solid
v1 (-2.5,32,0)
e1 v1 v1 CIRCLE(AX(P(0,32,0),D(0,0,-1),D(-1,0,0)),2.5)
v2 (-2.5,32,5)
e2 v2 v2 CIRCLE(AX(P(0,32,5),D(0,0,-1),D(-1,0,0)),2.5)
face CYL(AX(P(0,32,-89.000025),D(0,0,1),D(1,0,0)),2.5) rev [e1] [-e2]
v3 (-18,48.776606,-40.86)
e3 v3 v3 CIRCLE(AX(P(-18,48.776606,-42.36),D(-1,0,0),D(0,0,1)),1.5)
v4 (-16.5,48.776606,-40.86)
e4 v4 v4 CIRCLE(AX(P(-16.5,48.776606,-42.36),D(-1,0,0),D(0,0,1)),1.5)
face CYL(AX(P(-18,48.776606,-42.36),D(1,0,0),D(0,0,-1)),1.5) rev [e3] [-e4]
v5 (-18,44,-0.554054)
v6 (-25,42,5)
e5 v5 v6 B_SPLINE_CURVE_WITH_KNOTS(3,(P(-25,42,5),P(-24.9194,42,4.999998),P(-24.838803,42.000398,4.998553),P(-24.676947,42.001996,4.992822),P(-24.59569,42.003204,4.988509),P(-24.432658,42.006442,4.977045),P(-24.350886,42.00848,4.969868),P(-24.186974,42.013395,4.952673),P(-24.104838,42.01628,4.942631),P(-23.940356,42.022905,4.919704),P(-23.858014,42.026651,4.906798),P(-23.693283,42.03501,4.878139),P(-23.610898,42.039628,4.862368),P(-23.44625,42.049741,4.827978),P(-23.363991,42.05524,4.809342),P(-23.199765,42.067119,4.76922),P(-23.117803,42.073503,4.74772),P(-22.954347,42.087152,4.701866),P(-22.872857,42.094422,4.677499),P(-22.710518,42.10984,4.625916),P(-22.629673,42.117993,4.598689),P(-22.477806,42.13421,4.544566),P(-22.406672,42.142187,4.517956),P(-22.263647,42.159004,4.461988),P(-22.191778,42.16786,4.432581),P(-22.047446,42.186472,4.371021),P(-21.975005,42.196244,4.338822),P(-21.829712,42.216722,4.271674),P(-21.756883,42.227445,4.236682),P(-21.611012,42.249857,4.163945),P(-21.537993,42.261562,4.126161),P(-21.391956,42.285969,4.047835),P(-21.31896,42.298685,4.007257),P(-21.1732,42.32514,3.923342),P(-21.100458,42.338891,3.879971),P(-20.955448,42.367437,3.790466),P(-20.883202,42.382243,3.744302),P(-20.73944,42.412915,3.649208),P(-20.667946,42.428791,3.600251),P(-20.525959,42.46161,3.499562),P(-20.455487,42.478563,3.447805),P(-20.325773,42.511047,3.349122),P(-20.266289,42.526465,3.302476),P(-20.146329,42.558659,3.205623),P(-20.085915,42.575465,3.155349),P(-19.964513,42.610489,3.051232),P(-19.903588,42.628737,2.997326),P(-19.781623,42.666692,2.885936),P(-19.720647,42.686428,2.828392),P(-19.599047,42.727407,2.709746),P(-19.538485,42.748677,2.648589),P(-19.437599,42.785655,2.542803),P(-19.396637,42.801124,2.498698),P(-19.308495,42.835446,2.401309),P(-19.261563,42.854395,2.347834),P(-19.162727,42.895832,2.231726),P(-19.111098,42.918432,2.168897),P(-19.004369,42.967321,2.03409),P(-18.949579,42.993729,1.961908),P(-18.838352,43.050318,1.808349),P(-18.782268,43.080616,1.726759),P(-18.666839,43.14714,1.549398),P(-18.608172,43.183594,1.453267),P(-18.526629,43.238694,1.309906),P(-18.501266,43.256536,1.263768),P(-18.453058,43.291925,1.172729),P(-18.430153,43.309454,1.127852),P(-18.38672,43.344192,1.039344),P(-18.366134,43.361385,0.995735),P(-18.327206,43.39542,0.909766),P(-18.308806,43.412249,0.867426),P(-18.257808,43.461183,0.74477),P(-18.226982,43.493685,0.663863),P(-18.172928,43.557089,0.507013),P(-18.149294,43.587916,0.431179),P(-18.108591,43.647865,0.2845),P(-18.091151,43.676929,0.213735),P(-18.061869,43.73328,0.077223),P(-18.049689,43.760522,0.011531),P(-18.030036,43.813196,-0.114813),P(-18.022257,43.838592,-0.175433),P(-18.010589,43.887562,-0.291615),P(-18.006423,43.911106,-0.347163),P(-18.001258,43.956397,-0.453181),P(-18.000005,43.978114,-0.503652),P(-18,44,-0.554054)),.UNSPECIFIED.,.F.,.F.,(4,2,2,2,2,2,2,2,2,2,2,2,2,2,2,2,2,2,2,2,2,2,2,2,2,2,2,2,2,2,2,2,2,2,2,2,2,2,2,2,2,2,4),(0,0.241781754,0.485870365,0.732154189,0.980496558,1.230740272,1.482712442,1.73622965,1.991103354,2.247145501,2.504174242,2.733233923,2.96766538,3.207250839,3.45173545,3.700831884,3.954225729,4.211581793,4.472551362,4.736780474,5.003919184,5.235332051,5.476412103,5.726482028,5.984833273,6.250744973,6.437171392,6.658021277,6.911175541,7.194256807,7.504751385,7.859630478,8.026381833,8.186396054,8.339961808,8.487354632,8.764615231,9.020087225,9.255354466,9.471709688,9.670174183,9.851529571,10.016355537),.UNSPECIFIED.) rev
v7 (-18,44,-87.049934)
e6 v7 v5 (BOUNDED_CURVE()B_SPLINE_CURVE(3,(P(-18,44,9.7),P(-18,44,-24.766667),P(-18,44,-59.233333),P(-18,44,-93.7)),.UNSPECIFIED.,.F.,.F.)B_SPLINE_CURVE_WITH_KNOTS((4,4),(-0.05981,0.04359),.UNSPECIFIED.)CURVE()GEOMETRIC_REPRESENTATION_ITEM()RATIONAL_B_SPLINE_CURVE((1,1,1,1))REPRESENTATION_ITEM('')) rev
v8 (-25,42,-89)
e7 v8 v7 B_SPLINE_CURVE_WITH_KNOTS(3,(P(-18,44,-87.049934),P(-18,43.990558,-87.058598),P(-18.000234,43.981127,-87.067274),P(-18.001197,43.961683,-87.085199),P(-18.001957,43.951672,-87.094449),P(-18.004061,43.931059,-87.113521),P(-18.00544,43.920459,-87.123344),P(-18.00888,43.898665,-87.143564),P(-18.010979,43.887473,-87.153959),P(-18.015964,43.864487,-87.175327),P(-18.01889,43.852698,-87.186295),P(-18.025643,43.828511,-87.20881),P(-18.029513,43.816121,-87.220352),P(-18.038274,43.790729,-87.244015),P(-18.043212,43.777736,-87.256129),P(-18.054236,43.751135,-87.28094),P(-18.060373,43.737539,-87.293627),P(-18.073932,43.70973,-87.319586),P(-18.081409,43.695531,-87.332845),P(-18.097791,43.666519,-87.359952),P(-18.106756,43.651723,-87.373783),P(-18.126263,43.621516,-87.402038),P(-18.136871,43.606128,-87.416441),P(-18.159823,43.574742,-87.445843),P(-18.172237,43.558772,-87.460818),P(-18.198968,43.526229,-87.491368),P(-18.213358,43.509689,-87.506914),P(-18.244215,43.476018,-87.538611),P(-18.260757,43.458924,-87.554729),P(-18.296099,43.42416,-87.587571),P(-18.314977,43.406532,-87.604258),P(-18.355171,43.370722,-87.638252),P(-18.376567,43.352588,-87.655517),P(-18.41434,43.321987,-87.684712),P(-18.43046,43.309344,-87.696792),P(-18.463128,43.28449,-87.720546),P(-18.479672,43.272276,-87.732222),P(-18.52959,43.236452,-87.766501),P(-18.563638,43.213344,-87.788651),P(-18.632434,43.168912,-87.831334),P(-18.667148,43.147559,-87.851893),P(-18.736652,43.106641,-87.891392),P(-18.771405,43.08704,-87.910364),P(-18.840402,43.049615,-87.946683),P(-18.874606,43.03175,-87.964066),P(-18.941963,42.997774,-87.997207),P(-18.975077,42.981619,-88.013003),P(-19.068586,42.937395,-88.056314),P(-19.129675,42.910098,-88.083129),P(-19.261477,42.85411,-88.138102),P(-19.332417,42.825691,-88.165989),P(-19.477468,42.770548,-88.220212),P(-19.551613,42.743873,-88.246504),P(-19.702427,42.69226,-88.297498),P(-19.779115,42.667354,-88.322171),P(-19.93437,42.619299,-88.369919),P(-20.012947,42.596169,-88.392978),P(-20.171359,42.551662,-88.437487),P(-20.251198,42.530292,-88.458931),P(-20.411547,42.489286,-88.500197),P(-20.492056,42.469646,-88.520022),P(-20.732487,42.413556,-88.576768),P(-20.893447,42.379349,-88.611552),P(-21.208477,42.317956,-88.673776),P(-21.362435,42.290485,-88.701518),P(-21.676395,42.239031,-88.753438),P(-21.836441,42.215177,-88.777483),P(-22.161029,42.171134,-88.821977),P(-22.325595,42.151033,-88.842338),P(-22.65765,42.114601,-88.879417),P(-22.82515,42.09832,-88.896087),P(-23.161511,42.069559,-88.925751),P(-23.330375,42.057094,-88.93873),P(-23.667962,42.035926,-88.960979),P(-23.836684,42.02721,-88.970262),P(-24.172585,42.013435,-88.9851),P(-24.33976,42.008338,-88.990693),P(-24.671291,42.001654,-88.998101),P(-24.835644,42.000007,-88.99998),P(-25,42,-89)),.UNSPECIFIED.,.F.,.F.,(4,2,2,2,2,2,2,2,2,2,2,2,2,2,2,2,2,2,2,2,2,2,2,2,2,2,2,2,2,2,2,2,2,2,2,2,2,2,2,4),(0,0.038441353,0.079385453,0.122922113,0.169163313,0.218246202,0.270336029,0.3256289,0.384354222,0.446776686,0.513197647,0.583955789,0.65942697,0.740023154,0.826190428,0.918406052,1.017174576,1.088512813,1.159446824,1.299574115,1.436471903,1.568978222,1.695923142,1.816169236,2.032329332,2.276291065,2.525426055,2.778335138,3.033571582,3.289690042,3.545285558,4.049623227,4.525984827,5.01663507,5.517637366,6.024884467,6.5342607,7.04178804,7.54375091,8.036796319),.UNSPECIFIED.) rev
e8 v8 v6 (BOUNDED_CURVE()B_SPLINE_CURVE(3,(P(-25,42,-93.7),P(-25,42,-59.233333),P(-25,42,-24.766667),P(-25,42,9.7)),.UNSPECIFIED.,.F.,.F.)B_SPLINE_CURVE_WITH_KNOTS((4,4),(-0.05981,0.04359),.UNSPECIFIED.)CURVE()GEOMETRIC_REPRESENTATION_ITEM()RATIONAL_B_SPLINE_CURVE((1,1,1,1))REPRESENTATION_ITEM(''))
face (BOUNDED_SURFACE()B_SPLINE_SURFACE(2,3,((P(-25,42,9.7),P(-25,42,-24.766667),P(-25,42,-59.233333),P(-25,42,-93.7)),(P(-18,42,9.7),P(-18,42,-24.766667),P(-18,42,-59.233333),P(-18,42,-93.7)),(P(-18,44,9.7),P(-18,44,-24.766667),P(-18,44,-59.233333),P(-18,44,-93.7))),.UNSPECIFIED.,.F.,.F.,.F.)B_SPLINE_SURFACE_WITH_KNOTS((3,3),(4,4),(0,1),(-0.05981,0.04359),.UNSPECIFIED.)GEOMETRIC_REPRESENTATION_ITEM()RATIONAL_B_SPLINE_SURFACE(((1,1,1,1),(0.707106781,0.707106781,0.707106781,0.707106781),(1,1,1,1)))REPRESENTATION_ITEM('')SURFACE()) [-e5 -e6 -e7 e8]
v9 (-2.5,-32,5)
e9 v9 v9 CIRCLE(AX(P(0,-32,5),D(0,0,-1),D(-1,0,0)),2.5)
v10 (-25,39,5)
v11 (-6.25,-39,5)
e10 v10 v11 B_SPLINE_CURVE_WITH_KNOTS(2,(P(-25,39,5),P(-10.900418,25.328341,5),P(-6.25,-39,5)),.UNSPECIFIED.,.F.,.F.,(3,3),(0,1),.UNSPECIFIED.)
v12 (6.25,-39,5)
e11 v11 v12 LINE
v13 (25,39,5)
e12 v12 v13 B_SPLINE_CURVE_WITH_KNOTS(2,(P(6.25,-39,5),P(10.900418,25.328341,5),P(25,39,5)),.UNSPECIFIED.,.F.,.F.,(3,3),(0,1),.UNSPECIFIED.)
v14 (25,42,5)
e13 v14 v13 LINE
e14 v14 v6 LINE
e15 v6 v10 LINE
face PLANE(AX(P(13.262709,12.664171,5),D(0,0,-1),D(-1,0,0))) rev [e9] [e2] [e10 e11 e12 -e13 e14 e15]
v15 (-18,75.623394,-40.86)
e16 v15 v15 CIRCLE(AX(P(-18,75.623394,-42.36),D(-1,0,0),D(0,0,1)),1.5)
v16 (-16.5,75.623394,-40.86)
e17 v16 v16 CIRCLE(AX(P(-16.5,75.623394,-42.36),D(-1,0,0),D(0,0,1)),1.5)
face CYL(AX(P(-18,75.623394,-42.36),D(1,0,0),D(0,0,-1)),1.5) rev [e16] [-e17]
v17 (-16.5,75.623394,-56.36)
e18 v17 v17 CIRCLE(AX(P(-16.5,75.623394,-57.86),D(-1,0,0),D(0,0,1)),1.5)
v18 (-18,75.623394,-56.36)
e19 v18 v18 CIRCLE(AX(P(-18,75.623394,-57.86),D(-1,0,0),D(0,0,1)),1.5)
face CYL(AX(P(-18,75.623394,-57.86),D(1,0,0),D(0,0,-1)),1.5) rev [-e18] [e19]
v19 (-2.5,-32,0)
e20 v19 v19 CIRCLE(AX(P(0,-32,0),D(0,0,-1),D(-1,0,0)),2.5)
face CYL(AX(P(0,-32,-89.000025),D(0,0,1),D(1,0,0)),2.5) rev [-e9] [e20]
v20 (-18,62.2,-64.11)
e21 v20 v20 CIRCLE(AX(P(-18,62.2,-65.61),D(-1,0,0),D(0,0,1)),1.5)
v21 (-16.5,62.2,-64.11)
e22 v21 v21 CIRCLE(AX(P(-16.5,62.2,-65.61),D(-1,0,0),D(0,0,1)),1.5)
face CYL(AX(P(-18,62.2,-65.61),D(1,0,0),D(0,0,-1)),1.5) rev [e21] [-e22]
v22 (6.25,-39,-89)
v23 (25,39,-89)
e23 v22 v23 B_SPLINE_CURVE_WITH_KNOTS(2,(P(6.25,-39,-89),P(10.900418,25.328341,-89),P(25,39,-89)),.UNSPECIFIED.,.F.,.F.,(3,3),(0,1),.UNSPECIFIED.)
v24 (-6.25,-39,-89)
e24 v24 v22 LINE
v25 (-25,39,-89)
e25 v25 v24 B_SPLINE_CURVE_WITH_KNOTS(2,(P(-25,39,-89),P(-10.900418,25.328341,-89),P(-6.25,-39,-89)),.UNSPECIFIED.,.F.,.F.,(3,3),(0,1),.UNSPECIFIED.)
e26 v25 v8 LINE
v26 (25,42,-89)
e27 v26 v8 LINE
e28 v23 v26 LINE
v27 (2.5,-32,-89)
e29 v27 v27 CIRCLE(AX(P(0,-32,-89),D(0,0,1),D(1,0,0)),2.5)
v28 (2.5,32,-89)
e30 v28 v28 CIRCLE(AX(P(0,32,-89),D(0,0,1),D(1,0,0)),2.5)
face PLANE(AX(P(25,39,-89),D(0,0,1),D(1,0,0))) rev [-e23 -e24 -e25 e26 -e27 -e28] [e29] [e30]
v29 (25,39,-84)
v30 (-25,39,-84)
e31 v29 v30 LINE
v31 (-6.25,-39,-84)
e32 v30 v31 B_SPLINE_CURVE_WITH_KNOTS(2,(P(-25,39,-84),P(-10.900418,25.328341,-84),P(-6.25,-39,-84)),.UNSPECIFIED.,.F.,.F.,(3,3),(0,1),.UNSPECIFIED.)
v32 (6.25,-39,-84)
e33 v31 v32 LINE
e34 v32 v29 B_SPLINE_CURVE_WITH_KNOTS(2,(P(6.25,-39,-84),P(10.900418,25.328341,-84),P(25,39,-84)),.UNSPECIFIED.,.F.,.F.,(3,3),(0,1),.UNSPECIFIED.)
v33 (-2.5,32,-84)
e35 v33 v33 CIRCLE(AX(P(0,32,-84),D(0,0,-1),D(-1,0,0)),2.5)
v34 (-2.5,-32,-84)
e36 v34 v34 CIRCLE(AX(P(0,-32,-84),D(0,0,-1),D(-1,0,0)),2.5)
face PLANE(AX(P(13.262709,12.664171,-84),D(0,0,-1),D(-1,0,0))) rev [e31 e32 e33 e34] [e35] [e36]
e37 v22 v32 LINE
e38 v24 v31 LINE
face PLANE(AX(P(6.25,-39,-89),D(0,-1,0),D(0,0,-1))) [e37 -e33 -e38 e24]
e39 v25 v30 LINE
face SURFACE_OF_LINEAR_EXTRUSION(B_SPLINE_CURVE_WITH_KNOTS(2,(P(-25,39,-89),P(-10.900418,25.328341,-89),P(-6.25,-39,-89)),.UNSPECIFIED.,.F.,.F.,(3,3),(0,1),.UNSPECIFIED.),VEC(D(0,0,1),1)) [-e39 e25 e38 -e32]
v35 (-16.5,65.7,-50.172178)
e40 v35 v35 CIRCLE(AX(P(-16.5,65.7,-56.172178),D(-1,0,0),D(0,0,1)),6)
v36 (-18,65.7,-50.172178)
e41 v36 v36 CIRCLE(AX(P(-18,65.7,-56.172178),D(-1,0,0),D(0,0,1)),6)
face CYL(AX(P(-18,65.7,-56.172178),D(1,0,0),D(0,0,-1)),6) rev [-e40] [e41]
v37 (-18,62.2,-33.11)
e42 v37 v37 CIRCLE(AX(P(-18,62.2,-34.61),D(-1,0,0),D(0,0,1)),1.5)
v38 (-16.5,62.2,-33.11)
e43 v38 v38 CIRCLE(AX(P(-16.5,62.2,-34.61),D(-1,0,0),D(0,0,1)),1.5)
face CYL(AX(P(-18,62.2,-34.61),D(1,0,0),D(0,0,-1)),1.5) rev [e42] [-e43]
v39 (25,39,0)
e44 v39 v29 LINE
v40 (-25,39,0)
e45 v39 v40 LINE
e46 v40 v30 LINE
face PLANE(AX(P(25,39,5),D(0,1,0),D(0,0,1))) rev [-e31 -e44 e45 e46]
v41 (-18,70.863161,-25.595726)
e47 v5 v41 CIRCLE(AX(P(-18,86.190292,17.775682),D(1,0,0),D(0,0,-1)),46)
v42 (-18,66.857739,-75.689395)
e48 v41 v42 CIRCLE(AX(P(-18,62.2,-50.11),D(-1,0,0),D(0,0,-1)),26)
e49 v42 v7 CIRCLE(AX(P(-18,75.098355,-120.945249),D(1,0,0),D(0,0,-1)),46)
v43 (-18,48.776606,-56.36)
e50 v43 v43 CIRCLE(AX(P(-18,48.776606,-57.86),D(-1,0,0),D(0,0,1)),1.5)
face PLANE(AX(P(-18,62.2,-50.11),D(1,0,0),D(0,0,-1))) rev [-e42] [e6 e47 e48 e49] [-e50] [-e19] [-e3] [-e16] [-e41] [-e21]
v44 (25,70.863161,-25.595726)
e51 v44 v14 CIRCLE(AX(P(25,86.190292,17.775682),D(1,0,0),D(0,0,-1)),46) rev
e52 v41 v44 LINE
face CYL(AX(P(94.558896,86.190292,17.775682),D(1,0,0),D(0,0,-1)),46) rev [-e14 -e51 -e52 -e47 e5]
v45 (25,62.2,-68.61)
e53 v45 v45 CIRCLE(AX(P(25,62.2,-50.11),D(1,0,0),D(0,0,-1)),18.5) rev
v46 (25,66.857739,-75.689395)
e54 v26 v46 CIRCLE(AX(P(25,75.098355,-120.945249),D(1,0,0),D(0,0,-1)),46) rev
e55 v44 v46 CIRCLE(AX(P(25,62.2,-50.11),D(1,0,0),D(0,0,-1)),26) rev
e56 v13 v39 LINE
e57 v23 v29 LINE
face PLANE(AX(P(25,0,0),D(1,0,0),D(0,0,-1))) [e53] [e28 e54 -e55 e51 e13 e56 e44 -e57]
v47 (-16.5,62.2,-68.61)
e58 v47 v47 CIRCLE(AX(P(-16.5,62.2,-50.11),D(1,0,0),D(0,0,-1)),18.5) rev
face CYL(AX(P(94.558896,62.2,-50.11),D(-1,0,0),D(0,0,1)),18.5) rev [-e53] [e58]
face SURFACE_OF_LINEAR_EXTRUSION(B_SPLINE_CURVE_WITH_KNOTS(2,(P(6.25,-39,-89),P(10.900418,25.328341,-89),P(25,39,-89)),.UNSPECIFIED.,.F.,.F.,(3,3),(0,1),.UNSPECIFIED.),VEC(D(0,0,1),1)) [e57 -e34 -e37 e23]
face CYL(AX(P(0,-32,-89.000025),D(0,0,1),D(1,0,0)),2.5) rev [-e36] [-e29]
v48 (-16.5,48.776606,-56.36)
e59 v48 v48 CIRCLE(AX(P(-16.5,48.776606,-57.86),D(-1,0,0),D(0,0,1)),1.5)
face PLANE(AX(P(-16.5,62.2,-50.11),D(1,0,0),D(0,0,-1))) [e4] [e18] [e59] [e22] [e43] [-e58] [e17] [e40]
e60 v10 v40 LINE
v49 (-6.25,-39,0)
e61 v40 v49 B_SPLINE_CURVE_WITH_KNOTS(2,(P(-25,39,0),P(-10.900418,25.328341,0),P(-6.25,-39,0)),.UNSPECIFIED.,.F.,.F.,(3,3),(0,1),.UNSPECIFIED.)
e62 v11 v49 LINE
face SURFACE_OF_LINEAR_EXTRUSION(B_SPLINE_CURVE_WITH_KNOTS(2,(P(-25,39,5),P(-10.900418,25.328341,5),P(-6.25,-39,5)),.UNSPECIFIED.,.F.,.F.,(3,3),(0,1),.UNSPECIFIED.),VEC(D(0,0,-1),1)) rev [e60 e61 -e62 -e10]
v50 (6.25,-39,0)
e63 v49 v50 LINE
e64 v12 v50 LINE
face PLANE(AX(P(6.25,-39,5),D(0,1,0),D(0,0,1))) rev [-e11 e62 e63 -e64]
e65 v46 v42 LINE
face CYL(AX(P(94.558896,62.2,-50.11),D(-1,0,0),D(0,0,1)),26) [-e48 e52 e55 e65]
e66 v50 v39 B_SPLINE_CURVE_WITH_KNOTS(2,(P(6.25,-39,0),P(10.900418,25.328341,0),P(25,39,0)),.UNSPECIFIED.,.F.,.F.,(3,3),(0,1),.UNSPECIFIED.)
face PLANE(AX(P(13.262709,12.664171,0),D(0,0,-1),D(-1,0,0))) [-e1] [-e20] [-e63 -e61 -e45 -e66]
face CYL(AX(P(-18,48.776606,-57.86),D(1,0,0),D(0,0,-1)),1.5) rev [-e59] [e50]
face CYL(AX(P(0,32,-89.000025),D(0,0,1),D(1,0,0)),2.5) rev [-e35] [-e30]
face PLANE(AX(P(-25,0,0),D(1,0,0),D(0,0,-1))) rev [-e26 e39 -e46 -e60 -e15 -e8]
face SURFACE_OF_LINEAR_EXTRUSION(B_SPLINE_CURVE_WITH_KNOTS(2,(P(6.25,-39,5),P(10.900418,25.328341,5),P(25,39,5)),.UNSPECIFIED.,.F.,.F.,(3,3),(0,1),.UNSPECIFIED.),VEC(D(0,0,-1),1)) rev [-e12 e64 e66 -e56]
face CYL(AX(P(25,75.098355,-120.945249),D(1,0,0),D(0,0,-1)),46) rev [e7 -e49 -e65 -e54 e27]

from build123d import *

# Parameters (mm, degrees)
BOSS_EXTRUDE1_DEPTH      = 5
BOSS_EXTRUDE2_START      = -84
BOSS_EXTRUDE2_DEPTH      = 5
BOSS_EXTRUDE7_DEPTH      = 21
BOSS_EXTRUDE7_DEPTH_BACK = 29
BOSS_EXTRUDE7_START      = 4
SKETCH9_W                = 94
SKETCH9_H                = 3
CUT_EXTRUDE1_DEPTH       = 106.948100654
CUT_EXTRUDE1_DEPTH_BACK  = 106.948100654
SKETCH5_R                = 2.5
BOSS_EXTRUDE9_START      = -8.5
SKETCH13_R               = 18.5
BOSS_EXTRUDE9_DEPTH      = 41.5
BOSS_EXTRUDE10_START     = 1.5
SKETCH15_R               = 1.5
SKETCH15_R_2             = 6
BOSS_EXTRUDE10_DEPTH     = 1.5
FILLET2_R                = 46
FILLET4_SIZE             = 2
FILLET4_SIZE_2           = 7


with BuildPart() as part:
    # Sketch2 → Boss-Extrude1 (new body)
    with BuildSketch(Plane.XY):
        with BuildLine():
            Line((6.25, -39), (-6.25, -39))
            add(Edge.make_bspline(
                [(-25, 39), (-10.900418278, 25.328341358), (-6.25, -39)],
                knots=[0, 0, 0, 1, 1, 1], degree=2))
            Line((-25, 39), (25, 39))
            add(Edge.make_bspline(
                [(25, 39), (10.900418278, 25.328341358), (6.25, -39)],
                knots=[0, 0, 0, 1, 1, 1], degree=2))
        make_face()
    extrude(amount=BOSS_EXTRUDE1_DEPTH)



with BuildPart() as body_2:
    # Sketch3 → Boss-Extrude2 (new body)
    with BuildSketch(Plane.XY.offset(BOSS_EXTRUDE2_START)):
        with BuildLine():
            Line((6.25, -39), (-6.25, -39))
            add(Edge.make_bspline(
                [(-25, 39), (-10.900418278, 25.328341358), (-6.25, -39)],
                knots=[0, 0, 0, 1, 1, 1], degree=2))
            Line((-25, 39), (25, 39))
            add(Edge.make_bspline(
                [(25, 39), (10.900418278, 25.328341358), (6.25, -39)],
                knots=[0, 0, 0, 1, 1, 1], degree=2))
        make_face()
    extrude(amount=-BOSS_EXTRUDE2_DEPTH)


with BuildPart() as part_1:
    add(part.part)

    add(body_2.part)  # Boss-Extrude7 merges body 2
    # Sketch9 → Boss-Extrude7 (add, two sides: drawn at the far end of the back side and taken through both)
    with BuildSketch(Plane(origin=(0, 0, 0), x_dir=(0, 0, -1), z_dir=(1, 0, 0)).offset(BOSS_EXTRUDE7_START - BOSS_EXTRUDE7_DEPTH_BACK)):
        with Locations((42, 40.5)):
            Rectangle(SKETCH9_W, SKETCH9_H)
    extrude(amount=BOSS_EXTRUDE7_DEPTH + BOSS_EXTRUDE7_DEPTH_BACK)

    # Sketch5 → Cut-Extrude1 (cut, two sides: drawn at the far end of the back side and taken through both)
    with BuildSketch(Plane.XY.offset(5).offset(-CUT_EXTRUDE1_DEPTH_BACK)):
        with Locations((0, 32)):
            Circle(SKETCH5_R)
        with Locations((0, -32)):
            Circle(SKETCH5_R)
    extrude(amount=CUT_EXTRUDE1_DEPTH + CUT_EXTRUDE1_DEPTH_BACK, mode=Mode.SUBTRACT)

    # Sketch13 → Boss-Extrude9 (add)
    with BuildSketch(Plane.ZY.offset(25).offset(BOSS_EXTRUDE9_START)):
        with BuildLine():
            Line((-66.479483804, 42), (-33.740516196, 42))
            ThreePointArc((-33.740516196, 42), (-50.11, 88.2), (-66.479483804, 42))
        make_face()
        with Locations(Location((-50.11, 62.2, 0), (0, 0, 180))):
            Circle(SKETCH13_R, mode=Mode.SUBTRACT)
    extrude(amount=-BOSS_EXTRUDE9_DEPTH)

    # Sketch15 → Boss-Extrude10 (add)
    with BuildSketch(Plane.ZY.offset(16.5).offset(BOSS_EXTRUDE10_START)):
        with BuildLine():
            Line((-66.479483804, 42), (-33.740516196, 42))
            ThreePointArc((-33.740516196, 42), (-50.11, 88.2), (-66.479483804, 42))
        make_face()
        with Locations((-34.61, 62.2)):
            Circle(SKETCH15_R, mode=Mode.SUBTRACT)
        with Locations((-42.36, 48.776606241)):
            Circle(SKETCH15_R, mode=Mode.SUBTRACT)
        with Locations((-57.86, 48.776606241)):
            Circle(SKETCH15_R, mode=Mode.SUBTRACT)
        with Locations((-65.61, 62.2)):
            Circle(SKETCH15_R, mode=Mode.SUBTRACT)
        with Locations((-57.86, 75.623393759)):
            Circle(SKETCH15_R, mode=Mode.SUBTRACT)
        with Locations((-42.36, 75.623393759)):
            Circle(SKETCH15_R, mode=Mode.SUBTRACT)
        with Locations((-56.172177826, 65.7)):
            Circle(SKETCH15_R_2, mode=Mode.SUBTRACT)
    extrude(amount=-BOSS_EXTRUDE10_DEPTH)

    # Fillet2
    # the kernel refuses this fillet: 46 mm, written as the material it adds along each edge
    with BuildSketch(Plane(origin=(-18, 42, -66.479483804), x_dir=(0, 0, -1), z_dir=(1, 0, 0))) as fillet2_piece_1:
        with BuildLine():
            CenterArc((54.465764785, 33.098354832), FILLET2_R, 190.319893555, 35.695751296)
            Line((9.20991152, 24.857739245), (8.304794455, 24.692926933))
            ThreePointArc((8.304794455, 24.692926933), (7.148225336, 11.486576056), (-0.579227888, 0.714769231))
            Line((-0.579227888, 0.714769231), (0, -0.92))
            ThreePointArc((0, -0.92), (11.260258098, -0.92), (21.881611225, -0.661967097))
            Line((21.881611225, -0.661967097), (22.520516196, 0))
        make_face()
    extrude(amount=43)
    with BuildSketch(Plane(origin=(25, 42, -33.740516196), x_dir=(0, 0, 1), z_dir=(-1, 0, 0))) as fillet2_piece_2:
        with BuildLine():
            CenterArc((51.516198575, 44.19029237), FILLET2_R, 199.46302715, 54.412069486)
            Line((8.144790389, 28.863161134), (7.277362225, 28.556618509))
            ThreePointArc((7.277362225, 28.556618509), (7.767902037, 13.388758941), (-0.579227888, 0.714769231))
            Line((-0.579227888, 0.714769231), (0, -0.92))
            ThreePointArc((0, -0.92), (19.370258098, -0.92), (38.485002549, -0.883805847))
            Line((38.485002549, -0.883805847), (38.740516196, 0))
        make_face()
    extrude(amount=43)

    # Fillet4
    # an asymmetric fillet: 7, 2 mm, written as the material it adds along each edge
    with BuildSketch(Plane(origin=(-18, 42, -89), x_dir=(0, 1, 0), z_dir=(0, 0, 1))) as fillet4_piece_1_section:
        with BuildLine():
            Bezier((FILLET4_SIZE, 0), (0, 0), (0, FILLET4_SIZE_2), weights=[1, 0.707106781, 1])
            Line((0, FILLET4_SIZE_2), (0, 0))
            Line((0, 0), (FILLET4_SIZE, 0))
        make_face()
    fillet4_piece_1 = extrude(amount=94, mode=Mode.PRIVATE)
    fillet4_piece_1 = fillet4_piece_1 - Plane(origin=(-19.911254264, 86.19029237, 17.775682378), x_dir=(0, 0, 1), z_dir=(1, 0, 0)) * Cylinder(46, 216, mode=Mode.PRIVATE)
    fillet4_piece_1 = fillet4_piece_1 - Plane(origin=(-19.911254264, 75.098354832, -120.945248589), x_dir=(0, 0, -1), z_dir=(-1, 0, 0)) * Cylinder(46, 216, mode=Mode.PRIVATE)
    add(fillet4_piece_1)


solid = part_1.part
